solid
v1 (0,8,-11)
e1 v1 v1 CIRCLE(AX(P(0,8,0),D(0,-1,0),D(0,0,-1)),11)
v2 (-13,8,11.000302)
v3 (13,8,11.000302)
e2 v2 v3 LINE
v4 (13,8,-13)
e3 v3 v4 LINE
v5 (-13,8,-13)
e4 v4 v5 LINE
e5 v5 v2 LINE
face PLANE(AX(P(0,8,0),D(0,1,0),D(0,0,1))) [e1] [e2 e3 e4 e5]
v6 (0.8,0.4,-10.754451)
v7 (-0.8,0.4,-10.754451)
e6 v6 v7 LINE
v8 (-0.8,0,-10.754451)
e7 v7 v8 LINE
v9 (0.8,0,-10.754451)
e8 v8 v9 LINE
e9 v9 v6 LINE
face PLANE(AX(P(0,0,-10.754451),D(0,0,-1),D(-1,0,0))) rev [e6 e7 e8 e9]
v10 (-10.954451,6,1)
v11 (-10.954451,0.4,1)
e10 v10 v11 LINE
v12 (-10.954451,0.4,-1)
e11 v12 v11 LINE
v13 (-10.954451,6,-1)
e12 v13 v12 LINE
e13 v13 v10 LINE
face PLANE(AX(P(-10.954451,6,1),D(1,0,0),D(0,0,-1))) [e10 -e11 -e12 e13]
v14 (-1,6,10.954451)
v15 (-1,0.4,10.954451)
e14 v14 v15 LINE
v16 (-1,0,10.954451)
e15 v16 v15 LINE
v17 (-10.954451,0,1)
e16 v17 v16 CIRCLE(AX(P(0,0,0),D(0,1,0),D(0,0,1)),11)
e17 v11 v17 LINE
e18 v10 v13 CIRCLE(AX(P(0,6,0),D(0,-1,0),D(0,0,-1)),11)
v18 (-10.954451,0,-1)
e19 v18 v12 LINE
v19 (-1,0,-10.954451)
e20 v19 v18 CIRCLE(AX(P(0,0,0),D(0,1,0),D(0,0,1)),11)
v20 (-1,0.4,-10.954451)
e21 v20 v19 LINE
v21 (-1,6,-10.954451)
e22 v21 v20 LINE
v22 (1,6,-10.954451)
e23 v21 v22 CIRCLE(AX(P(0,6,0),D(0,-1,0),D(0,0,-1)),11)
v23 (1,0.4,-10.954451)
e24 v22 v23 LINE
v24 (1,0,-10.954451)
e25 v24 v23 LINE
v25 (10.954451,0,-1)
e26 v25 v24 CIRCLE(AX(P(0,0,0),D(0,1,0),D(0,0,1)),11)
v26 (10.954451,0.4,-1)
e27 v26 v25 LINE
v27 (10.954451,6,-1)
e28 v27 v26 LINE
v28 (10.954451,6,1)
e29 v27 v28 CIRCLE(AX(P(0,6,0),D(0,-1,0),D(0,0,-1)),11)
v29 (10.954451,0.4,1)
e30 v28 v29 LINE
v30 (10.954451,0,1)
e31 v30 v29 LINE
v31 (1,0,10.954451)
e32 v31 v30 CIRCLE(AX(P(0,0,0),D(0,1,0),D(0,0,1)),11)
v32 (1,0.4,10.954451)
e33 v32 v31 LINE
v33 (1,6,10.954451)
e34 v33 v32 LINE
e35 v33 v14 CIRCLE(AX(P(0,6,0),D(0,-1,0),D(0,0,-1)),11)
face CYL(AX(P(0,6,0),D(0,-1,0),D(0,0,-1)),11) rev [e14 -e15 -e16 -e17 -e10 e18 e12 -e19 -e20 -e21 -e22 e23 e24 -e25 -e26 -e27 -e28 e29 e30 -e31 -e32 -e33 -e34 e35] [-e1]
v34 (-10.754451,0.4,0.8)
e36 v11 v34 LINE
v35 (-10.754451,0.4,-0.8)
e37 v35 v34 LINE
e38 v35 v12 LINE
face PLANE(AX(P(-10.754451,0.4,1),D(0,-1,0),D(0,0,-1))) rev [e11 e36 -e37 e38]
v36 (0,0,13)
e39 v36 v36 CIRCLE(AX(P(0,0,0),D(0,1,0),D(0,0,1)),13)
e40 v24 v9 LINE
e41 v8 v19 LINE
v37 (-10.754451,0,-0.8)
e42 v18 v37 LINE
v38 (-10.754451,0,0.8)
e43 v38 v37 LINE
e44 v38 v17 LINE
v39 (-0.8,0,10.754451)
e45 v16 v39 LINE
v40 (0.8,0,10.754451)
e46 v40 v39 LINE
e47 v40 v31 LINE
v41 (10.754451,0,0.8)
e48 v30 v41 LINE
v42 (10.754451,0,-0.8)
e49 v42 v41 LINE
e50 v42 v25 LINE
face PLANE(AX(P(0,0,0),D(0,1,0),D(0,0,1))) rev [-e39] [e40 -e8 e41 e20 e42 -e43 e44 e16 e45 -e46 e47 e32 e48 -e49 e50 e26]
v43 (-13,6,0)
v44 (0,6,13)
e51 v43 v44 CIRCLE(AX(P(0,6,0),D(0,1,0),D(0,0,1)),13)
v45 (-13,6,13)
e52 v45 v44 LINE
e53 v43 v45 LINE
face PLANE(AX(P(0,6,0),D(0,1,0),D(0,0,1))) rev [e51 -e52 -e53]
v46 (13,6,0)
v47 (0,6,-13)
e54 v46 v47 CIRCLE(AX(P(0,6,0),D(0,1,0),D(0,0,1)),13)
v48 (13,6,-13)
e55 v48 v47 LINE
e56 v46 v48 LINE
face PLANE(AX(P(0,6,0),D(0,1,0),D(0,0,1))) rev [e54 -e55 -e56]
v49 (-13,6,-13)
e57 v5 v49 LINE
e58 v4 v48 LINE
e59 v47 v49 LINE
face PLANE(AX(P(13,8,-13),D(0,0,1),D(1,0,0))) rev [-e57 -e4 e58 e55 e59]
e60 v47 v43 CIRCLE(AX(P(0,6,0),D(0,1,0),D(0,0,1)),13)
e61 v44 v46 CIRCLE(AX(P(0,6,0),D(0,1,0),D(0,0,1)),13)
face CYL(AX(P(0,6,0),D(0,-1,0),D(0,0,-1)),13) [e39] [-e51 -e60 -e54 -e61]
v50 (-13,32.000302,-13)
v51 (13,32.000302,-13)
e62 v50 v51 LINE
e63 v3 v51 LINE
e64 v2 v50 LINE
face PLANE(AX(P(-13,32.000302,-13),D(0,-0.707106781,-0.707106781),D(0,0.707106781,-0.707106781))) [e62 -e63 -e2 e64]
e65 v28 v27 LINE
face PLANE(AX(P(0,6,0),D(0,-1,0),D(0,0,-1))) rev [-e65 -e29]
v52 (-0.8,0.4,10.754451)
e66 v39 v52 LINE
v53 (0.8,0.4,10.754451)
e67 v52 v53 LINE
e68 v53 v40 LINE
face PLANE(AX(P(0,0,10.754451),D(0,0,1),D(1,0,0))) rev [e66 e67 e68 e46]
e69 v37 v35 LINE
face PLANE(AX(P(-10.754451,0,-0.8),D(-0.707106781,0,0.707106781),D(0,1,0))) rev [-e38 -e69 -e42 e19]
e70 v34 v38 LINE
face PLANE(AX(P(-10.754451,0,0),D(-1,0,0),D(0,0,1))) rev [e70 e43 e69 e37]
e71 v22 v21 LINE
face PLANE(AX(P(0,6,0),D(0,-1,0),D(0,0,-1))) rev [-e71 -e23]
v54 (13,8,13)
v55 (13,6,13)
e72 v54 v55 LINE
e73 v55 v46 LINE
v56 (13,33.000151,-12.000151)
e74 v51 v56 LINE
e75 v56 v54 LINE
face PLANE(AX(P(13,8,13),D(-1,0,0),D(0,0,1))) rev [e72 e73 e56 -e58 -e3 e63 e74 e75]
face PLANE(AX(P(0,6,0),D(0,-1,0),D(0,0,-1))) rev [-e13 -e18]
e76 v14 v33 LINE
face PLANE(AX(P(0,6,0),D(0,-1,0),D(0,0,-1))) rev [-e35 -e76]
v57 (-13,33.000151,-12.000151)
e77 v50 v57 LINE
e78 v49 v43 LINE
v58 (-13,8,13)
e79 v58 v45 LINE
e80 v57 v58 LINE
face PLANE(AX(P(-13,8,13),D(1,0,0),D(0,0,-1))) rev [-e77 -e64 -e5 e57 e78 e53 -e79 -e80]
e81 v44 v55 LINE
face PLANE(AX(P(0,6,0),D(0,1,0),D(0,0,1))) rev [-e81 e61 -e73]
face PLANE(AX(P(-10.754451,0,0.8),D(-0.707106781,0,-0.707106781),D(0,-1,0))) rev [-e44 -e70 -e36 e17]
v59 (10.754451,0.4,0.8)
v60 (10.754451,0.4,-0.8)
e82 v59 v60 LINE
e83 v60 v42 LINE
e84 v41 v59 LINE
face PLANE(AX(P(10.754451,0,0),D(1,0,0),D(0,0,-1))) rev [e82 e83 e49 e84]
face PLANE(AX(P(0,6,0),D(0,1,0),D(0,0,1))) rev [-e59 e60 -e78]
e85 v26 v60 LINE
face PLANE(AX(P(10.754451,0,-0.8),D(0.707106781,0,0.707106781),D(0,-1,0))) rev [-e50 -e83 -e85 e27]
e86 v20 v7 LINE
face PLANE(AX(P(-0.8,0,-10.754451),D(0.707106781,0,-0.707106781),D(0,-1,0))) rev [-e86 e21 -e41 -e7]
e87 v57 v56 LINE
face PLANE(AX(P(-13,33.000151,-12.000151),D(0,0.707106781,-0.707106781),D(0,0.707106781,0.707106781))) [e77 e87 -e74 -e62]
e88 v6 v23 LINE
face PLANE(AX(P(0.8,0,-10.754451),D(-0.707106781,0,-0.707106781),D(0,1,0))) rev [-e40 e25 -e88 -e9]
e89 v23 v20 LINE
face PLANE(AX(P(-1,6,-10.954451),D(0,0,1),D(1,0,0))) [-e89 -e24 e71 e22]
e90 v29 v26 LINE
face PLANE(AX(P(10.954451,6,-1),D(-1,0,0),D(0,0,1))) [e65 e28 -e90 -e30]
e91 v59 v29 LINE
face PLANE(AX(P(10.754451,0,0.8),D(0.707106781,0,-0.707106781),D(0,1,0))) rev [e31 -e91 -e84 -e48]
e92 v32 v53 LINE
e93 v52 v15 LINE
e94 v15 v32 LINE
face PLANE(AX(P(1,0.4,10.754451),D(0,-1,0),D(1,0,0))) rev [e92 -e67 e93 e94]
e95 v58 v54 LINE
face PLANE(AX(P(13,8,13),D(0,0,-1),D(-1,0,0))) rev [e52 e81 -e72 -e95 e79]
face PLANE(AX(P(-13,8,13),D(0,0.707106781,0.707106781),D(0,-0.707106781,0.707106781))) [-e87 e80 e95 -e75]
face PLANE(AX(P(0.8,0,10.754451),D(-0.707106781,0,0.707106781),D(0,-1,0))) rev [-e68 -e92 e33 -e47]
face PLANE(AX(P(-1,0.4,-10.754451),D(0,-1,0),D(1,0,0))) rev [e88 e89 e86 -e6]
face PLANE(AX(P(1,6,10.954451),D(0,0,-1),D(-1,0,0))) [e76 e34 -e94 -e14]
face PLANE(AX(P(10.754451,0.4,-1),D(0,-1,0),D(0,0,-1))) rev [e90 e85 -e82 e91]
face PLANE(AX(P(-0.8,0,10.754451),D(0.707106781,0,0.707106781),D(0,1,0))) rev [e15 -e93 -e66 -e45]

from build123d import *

# Parameters (mm, degrees)
SKETCH1_R           = 13
BOSS_EXTRUDE1_DEPTH = 6
SKETCH2_W           = 2
SKETCH2_H           = 0.4
BOSS_EXTRUDE2_DEPTH = 0.2
SKETCH3_W           = 2
SKETCH3_H           = 0.4
BOSS_EXTRUDE3_DEPTH = 0.2
SKETCH4_W           = 2
SKETCH4_H           = 0.4
BOSS_EXTRUDE4_DEPTH = 0.2
CHAMFER1_SIZE       = 0.2
SKETCH5_W           = 2
SKETCH5_H           = 0.4
BOSS_EXTRUDE5_DEPTH = 0.2
CHAMFER2_SIZE       = 0.2
SKETCH6_W           = 26
SKETCH6_H           = 26
BOSS_EXTRUDE6_DEPTH = 2
SKETCH7_R           = 11
CUT_EXTRUDE1_DEPTH  = 2
BOSS_EXTRUDE7_DEPTH = 26


with BuildPart() as part:
    # Sketch1 → Boss-Extrude1 (new body)
    with BuildSketch(Plane(origin=(0, 0, 0), x_dir=(1, 0, 0), z_dir=(0, 1, 0))):
        with Locations(Location((0, 0, 0), (0, 0, 270))):
            Circle(SKETCH1_R)
        with BuildLine():
            Line((-1, 10.95445115), (1, 10.95445115))
            ThreePointArc((1, 10.95445115), (7.778174593, 7.778174593), (10.95445115, 1))
            Line((10.95445115, 1), (10.95445115, -1))
            ThreePointArc((10.95445115, -1), (7.778174593, -7.778174593), (1, -10.95445115))
            Line((1, -10.95445115), (-1, -10.95445115))
            ThreePointArc((-1, -10.95445115), (-7.778174593, -7.778174593), (-10.95445115, -1))
            Line((-10.95445115, -1), (-10.95445115, 1))
            ThreePointArc((-10.95445115, 1), (-7.778174593, 7.778174593), (-1, 10.95445115))
        make_face(mode=Mode.SUBTRACT)
    extrude(amount=BOSS_EXTRUDE1_DEPTH)

    # Sketch2 → Boss-Extrude2 (add)
    with BuildSketch(Plane.XY.offset(-10.95445115)):
        with Locations((0, 0.2)):
            Rectangle(SKETCH2_W, SKETCH2_H)
    extrude(amount=BOSS_EXTRUDE2_DEPTH)

    # Sketch3 → Boss-Extrude3 (add)
    with BuildSketch(Plane(origin=(-10.95445115, 0, 0), x_dir=(0, 0, -1), z_dir=(1, 0, 0))):
        with Locations((0, 0.2)):
            Rectangle(SKETCH3_W, SKETCH3_H)
    extrude(amount=BOSS_EXTRUDE3_DEPTH)

    # Sketch4 → Boss-Extrude4 (add)
    with BuildSketch(Plane(origin=(0, 0, 10.95445115), x_dir=(-1, 0, 0), z_dir=(0, 0, -1))):
        with Locations((0, 0.2)):
            Rectangle(SKETCH4_W, SKETCH4_H)
    extrude(amount=BOSS_EXTRUDE4_DEPTH)

    # Chamfer1
    chamfer1_edges = [part.edges().sort_by_distance(p)[0] for p in [
        (1, 0.2, -10.75445115),
        (-1, 0.2, -10.75445115),
        (-10.75445115, 0.2, 1),
        (-10.75445115, 0.2, -1),
        (-1, 0.2, 10.75445115),
        (1, 0.2, 10.75445115),
    ]]
    chamfer(chamfer1_edges, length=CHAMFER1_SIZE - 0.0001)  # a hair under: the kernel refuses the full size

    # Sketch5 → Boss-Extrude5 (add)
    with BuildSketch(Plane.ZY.offset(-10.95445115)):
        with Locations((0, 0.2)):
            Rectangle(SKETCH5_W, SKETCH5_H)
    extrude(amount=BOSS_EXTRUDE5_DEPTH)

    # Chamfer2
    chamfer2_edges = [part.edges().sort_by_distance(p)[0] for p in [
        (10.75445115, 0.2, 1),
        (10.75445115, 0.2, -1),
    ]]
    chamfer(chamfer2_edges, length=CHAMFER2_SIZE - 0.0001)  # a hair under: the kernel refuses the full size

    # Sketch6 → Boss-Extrude6 (add)
    with BuildSketch(Plane(origin=(0, 6, 0), x_dir=(1, 0, 0), z_dir=(0, 1, 0))):
        Rectangle(SKETCH6_W, SKETCH6_H)
    extrude(amount=BOSS_EXTRUDE6_DEPTH)

    # Sketch7 → Cut-Extrude1 (cut)
    with BuildSketch(Plane.XZ.offset(-6)):
        with Locations(Location((0, 0, 0), (0, 0, 270))):
            Circle(SKETCH7_R)
    extrude(amount=-CUT_EXTRUDE1_DEPTH, mode=Mode.SUBTRACT)

    # Sketch8 → Boss-Extrude7 (add)
    with BuildSketch(Plane(origin=(13, 0, 0), x_dir=(0, 0, -1), z_dir=(1, 0, 0))):
        Polygon((-13, 8), (12.000151011, 33.000151011), (13, 32.000302023), (-11.000302023, 8), align=None)
    extrude(amount=-BOSS_EXTRUDE7_DEPTH)


solid = part.part
